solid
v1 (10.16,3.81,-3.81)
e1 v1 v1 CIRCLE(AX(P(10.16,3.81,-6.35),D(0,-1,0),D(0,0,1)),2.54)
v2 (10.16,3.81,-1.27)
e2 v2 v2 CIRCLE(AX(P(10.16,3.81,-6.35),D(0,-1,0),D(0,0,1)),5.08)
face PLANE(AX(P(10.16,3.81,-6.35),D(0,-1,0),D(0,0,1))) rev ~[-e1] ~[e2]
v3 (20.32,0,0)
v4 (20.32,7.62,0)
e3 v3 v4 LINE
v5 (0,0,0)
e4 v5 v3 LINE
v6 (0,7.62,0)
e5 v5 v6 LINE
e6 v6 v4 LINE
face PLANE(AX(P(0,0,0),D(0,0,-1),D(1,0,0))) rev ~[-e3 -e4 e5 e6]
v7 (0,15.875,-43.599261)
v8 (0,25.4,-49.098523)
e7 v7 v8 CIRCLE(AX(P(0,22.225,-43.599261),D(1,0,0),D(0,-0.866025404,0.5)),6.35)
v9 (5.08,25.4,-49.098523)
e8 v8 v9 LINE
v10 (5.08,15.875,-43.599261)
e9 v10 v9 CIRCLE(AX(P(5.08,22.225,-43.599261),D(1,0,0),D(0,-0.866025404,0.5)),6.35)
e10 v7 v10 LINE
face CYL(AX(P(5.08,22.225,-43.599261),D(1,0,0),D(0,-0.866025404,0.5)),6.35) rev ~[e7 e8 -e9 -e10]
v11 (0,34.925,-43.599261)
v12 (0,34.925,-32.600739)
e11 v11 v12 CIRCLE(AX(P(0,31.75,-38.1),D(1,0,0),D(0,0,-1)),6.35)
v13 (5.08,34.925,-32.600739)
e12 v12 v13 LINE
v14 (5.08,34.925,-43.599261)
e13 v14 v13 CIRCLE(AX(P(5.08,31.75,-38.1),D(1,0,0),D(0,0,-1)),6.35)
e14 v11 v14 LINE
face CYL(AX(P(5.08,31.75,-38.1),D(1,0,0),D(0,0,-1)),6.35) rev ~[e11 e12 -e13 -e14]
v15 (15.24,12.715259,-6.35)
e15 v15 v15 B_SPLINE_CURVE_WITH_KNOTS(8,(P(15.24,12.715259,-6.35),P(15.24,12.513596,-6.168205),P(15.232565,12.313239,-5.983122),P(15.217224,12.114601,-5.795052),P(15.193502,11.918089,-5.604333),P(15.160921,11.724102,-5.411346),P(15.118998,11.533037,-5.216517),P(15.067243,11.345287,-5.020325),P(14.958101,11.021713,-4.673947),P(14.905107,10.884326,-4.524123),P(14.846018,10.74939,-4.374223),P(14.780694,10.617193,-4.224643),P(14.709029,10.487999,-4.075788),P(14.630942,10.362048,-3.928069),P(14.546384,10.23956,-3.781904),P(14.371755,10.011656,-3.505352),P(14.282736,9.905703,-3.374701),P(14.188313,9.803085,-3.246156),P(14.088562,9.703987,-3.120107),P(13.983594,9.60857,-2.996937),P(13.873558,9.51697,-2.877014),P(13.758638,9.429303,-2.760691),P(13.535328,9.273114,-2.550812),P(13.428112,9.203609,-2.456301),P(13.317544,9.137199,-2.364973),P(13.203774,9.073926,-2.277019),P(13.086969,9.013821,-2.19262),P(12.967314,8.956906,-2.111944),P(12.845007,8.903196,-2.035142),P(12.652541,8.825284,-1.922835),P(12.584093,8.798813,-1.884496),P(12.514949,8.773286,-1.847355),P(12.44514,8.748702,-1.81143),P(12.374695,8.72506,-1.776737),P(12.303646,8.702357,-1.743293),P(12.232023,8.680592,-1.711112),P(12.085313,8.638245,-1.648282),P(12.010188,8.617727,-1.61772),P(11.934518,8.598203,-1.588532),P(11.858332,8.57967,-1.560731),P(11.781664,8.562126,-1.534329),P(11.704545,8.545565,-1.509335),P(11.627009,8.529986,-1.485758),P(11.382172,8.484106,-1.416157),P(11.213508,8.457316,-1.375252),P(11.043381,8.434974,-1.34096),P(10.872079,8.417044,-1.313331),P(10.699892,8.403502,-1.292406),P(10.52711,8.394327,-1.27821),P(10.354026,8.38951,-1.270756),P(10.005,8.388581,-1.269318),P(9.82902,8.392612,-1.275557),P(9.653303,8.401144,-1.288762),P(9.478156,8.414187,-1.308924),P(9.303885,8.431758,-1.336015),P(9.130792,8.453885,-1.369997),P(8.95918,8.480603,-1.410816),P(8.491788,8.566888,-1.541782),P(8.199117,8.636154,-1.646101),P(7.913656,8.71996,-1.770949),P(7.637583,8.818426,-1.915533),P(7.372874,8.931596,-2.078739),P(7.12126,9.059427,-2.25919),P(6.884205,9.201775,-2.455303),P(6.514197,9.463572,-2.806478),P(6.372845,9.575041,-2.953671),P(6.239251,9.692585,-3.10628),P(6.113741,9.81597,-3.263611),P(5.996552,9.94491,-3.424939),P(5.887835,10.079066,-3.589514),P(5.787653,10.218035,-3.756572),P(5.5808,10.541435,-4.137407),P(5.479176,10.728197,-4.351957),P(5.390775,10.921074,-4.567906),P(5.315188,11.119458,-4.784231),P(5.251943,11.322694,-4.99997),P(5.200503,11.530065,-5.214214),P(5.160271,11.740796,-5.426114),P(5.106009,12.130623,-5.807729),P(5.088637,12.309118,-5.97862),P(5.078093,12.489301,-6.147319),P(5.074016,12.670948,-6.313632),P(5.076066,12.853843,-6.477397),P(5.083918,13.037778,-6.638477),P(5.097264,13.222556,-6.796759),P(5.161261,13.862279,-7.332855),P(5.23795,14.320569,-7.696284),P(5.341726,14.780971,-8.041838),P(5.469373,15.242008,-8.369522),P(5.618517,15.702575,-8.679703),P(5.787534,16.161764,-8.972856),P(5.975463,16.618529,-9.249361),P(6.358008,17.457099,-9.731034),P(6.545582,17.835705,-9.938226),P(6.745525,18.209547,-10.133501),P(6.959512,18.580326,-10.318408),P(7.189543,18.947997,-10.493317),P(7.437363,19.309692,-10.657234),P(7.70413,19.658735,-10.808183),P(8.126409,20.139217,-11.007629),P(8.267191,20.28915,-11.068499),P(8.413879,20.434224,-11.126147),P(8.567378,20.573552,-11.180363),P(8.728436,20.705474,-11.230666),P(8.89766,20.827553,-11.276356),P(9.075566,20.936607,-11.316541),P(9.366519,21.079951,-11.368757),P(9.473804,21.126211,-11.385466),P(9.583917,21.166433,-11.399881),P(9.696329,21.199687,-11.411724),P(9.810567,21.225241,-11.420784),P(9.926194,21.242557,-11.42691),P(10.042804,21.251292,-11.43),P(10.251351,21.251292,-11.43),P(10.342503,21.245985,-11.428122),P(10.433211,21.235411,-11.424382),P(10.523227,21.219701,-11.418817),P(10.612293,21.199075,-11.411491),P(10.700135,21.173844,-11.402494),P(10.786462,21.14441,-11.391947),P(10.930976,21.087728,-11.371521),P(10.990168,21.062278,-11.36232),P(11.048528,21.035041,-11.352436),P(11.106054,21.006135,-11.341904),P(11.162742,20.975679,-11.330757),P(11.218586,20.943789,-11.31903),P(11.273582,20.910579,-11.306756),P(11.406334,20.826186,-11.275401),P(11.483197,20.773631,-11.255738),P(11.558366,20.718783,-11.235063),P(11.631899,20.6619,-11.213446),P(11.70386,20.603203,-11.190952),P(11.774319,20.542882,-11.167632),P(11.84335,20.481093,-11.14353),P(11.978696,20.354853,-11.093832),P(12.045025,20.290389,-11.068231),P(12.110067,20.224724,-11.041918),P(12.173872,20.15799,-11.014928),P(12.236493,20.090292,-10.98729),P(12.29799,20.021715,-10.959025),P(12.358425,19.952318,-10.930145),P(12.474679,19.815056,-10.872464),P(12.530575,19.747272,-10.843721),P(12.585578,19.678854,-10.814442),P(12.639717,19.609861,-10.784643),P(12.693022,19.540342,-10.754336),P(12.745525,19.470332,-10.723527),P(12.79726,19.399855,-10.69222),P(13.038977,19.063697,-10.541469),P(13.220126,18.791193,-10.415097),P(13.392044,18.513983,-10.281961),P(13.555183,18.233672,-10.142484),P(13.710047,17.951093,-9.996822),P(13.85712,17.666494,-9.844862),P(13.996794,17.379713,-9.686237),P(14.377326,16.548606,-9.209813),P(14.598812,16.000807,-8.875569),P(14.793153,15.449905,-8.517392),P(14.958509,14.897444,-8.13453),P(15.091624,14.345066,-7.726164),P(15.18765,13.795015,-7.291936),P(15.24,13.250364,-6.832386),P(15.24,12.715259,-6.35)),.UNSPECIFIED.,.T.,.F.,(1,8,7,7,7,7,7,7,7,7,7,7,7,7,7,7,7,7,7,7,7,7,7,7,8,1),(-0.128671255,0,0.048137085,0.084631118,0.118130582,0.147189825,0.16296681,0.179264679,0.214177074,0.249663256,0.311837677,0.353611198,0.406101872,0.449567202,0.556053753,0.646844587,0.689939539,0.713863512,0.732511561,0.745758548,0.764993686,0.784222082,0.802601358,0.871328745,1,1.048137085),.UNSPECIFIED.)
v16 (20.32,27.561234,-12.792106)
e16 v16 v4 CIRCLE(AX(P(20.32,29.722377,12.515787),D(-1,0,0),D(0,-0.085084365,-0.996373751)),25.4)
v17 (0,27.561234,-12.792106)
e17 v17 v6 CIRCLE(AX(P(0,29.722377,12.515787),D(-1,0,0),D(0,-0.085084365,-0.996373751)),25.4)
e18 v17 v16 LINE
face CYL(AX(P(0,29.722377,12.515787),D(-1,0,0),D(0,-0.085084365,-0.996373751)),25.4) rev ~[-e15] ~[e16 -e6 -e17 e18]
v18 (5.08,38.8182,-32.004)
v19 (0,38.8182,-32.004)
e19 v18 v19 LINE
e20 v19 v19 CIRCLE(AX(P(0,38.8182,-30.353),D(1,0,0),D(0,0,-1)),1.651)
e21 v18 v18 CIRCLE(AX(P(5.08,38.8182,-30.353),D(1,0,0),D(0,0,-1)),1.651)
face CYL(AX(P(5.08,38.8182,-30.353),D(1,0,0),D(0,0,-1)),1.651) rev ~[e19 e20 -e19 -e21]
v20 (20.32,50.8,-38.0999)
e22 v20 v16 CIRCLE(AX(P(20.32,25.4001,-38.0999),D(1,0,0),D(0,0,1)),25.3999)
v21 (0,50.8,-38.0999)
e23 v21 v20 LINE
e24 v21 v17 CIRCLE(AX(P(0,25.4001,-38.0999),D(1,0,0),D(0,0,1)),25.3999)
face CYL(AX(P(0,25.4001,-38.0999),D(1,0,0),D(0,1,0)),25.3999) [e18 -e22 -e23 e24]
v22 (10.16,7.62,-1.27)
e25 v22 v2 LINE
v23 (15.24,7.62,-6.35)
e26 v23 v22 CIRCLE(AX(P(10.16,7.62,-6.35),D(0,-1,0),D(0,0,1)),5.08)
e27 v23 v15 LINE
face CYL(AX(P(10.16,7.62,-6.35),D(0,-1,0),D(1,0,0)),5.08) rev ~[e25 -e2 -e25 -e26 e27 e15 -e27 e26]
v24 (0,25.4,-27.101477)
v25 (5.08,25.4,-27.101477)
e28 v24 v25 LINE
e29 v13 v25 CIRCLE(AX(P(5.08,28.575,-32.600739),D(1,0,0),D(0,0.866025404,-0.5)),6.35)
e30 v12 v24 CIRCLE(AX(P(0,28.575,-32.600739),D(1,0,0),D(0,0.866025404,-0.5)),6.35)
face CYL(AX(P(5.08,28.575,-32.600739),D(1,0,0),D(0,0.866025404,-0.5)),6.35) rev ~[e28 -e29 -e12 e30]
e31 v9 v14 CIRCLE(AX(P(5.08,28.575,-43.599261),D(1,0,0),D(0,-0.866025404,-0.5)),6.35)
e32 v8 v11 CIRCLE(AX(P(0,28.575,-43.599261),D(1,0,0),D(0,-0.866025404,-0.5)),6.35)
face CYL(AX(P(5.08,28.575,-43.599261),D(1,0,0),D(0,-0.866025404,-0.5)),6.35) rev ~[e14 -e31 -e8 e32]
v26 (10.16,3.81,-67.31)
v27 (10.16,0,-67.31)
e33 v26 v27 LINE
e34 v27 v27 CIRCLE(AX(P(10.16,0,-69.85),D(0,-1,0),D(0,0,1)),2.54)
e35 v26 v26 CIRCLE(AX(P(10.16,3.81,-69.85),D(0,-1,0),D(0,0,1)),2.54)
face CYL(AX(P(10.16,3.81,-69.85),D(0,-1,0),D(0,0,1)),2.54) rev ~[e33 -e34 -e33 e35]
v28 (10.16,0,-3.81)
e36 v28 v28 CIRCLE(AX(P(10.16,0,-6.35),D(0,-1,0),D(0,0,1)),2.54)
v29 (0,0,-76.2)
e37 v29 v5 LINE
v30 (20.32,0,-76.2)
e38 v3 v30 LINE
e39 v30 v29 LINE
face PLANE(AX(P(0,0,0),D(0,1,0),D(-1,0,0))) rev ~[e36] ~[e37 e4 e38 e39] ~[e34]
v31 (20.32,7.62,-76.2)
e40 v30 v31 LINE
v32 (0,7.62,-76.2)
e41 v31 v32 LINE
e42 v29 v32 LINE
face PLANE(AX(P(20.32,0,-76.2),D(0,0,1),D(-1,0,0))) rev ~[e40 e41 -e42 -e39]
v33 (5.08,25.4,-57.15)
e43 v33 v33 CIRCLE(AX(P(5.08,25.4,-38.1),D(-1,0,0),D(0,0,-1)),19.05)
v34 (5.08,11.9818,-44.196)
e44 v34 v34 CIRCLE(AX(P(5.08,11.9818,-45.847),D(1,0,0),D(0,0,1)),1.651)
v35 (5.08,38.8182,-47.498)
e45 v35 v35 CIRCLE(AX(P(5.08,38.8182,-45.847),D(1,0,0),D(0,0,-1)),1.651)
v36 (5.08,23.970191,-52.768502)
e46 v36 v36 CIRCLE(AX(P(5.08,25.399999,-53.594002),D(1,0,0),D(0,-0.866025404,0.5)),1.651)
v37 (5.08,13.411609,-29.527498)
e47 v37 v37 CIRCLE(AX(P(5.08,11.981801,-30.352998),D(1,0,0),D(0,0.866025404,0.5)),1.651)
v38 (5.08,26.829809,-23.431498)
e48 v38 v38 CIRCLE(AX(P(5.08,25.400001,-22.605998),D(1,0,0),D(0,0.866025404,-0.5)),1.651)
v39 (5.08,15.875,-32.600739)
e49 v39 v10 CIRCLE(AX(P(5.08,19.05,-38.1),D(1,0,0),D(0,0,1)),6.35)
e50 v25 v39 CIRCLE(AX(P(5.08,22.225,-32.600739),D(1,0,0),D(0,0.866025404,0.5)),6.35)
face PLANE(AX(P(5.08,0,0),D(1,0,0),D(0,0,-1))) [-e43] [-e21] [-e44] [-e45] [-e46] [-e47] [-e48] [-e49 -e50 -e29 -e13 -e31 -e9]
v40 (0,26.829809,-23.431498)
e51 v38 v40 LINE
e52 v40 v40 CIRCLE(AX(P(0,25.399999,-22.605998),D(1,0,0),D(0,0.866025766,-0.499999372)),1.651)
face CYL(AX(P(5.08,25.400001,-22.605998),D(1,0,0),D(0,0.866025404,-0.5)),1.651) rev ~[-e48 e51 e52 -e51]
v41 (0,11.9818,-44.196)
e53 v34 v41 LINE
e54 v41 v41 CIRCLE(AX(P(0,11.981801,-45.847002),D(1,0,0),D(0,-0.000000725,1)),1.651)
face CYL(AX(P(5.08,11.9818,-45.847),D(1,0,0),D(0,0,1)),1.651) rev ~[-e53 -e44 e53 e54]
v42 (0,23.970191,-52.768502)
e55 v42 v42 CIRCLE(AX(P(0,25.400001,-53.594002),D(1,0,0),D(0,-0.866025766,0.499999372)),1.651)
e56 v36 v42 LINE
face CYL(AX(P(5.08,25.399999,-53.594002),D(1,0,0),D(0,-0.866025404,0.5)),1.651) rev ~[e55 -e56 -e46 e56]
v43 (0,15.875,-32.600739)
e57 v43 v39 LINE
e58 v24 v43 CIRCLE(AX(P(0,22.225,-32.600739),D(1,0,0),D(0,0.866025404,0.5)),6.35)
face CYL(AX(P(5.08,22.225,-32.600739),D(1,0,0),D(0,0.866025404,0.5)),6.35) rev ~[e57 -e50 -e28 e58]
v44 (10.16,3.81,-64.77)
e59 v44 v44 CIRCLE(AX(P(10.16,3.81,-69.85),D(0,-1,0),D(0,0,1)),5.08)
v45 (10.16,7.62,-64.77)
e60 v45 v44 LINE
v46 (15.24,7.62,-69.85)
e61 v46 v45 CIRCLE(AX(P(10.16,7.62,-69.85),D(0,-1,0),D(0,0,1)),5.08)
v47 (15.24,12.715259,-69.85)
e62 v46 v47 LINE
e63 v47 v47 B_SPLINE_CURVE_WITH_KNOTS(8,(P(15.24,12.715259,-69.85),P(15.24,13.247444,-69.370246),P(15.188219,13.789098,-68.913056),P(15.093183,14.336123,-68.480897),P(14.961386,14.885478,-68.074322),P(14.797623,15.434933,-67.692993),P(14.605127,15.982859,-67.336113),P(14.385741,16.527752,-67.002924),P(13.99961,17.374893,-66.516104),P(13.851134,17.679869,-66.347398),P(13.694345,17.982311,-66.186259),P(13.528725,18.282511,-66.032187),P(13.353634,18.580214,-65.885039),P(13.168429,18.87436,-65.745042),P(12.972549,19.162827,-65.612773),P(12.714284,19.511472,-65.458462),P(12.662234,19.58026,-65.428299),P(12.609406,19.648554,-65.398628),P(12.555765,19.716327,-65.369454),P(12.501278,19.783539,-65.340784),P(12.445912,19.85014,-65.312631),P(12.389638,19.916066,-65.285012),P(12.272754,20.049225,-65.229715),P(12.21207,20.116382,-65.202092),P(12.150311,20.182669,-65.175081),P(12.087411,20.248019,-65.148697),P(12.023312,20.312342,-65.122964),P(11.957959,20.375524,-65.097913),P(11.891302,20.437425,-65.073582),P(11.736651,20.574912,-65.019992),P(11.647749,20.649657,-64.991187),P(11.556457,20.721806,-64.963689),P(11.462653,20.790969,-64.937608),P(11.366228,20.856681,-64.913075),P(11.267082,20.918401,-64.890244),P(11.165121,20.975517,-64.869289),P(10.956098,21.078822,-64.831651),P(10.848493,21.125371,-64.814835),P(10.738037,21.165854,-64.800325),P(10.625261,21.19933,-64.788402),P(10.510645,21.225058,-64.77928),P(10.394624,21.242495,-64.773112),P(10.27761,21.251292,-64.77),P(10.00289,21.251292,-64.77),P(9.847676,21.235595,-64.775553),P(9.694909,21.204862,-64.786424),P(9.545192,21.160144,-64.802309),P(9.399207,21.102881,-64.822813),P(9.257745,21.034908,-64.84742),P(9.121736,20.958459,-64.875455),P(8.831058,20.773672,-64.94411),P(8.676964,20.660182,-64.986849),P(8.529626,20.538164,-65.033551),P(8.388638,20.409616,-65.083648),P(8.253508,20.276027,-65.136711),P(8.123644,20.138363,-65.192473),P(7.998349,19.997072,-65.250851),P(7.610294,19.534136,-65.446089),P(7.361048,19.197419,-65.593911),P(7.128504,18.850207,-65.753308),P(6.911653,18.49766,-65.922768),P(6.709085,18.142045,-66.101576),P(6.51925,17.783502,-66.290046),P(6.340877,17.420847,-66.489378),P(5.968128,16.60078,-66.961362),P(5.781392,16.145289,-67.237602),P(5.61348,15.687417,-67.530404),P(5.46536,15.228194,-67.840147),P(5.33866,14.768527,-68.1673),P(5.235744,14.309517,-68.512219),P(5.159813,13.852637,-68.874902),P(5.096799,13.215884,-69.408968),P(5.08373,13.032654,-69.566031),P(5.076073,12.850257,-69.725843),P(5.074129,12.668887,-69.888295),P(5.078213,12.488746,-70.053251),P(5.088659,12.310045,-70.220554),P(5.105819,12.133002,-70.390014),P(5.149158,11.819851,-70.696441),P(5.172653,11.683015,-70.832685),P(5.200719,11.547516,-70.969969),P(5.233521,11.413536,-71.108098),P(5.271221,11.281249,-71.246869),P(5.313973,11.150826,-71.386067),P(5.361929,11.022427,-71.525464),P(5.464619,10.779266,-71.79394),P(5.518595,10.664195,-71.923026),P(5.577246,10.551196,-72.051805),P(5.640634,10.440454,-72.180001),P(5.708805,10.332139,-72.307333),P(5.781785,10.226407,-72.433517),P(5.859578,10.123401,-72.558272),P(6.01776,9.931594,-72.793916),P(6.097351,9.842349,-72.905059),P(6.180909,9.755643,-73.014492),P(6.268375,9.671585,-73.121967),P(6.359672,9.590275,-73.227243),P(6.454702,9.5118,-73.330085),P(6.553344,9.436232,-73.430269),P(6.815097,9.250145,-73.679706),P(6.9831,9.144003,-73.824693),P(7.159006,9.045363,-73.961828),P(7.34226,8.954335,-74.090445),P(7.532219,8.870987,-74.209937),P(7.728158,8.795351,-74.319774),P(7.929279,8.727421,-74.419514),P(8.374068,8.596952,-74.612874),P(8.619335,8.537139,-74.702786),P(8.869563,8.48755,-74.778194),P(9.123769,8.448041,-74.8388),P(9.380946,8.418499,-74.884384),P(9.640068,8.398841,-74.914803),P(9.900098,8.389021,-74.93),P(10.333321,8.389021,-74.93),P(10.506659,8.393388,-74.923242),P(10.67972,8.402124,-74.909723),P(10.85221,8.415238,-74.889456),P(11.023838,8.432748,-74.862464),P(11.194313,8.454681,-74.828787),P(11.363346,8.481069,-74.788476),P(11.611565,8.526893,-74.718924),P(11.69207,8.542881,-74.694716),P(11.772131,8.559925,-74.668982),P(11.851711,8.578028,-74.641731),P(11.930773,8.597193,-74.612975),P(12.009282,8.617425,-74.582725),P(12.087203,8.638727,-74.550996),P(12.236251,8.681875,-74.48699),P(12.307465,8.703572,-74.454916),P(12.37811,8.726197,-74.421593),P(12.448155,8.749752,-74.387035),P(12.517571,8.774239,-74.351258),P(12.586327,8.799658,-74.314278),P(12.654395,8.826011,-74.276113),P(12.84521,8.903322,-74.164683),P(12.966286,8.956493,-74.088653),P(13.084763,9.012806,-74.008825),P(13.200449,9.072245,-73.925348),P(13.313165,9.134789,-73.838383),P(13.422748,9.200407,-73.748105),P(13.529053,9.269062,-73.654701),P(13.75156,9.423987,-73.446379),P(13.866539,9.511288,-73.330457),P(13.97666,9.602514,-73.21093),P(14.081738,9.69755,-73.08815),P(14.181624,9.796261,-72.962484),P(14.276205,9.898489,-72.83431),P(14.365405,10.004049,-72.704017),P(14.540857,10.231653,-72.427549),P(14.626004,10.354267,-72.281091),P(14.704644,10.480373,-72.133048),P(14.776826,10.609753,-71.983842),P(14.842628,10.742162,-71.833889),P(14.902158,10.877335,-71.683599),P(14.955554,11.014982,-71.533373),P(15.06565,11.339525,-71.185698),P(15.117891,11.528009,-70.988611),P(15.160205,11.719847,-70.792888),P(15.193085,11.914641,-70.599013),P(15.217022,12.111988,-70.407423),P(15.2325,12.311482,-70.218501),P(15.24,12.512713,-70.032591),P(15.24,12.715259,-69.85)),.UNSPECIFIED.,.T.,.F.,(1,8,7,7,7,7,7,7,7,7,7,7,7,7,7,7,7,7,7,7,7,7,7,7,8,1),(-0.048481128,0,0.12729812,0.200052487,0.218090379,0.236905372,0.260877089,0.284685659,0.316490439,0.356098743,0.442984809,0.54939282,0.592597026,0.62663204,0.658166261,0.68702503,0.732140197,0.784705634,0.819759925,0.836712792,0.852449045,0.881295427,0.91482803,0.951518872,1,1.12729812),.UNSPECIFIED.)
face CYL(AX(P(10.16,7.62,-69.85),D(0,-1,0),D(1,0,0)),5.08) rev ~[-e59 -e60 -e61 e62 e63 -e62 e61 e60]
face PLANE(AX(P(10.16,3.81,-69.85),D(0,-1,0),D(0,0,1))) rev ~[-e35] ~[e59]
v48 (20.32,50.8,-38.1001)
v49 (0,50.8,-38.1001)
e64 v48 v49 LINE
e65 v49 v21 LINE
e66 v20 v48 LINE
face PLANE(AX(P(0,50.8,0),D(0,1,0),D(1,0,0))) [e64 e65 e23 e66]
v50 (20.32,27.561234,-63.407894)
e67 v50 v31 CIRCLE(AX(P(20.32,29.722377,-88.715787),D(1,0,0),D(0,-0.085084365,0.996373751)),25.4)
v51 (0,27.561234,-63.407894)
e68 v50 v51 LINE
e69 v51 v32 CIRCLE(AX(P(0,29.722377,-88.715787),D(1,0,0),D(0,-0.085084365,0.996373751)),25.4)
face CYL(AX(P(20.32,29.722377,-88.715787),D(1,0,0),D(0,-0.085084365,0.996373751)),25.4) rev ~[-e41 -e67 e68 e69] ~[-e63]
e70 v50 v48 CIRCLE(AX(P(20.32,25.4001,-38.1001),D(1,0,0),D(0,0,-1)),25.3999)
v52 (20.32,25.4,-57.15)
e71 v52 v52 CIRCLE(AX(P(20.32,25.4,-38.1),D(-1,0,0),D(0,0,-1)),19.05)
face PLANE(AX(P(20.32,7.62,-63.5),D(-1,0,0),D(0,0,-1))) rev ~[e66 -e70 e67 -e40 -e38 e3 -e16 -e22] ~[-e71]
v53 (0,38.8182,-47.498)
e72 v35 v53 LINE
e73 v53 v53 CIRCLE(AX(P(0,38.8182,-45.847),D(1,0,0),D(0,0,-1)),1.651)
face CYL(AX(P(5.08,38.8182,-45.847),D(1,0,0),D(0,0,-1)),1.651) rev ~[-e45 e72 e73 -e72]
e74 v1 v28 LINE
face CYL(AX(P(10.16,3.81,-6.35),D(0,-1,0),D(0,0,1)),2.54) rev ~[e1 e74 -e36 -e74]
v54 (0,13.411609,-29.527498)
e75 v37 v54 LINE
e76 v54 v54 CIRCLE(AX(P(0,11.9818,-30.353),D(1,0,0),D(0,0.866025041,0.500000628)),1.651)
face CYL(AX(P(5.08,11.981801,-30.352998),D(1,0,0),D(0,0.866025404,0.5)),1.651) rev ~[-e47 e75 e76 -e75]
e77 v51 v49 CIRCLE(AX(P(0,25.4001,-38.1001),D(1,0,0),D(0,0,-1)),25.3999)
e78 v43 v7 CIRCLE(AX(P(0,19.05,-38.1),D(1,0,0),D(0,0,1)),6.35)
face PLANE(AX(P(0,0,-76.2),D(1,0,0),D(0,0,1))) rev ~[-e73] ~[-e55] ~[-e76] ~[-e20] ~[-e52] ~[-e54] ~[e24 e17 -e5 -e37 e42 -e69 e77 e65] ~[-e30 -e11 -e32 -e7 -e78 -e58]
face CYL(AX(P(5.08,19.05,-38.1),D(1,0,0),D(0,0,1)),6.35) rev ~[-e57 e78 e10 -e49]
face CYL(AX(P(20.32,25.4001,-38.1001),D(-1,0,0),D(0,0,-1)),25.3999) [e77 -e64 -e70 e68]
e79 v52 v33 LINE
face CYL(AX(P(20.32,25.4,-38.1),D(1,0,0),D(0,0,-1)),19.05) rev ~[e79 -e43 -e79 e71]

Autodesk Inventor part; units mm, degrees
ref_plane "YZ Plane" through (0, 0, 0) normal (1, 0, 0) x (0, 1, 0)
ref_plane "XZ Plane" through (0, 0, 0) normal (0, 1, 0) x (-1, 0, 0)
ref_plane "XY Plane" through (0, 0, 0) normal (0, 0, 1) x (1, 0, 0)
sketch "Sketch1" plane through (0, 0, 0) normal (0, 1, 0) x (-1, 0, 0)
  line L0 (0, 0) -> (-20.32, 0)
  line L1 (-20.32, 0) -> (-20.32, -76.2)
  line L2 (-20.32, -76.2) -> (0, -76.2)
  line L3 (0, -76.2) -> (0, 0)
  dimension "d0" = 20.32
  dimension "d1" = 76.2
extrude "Extrusion1" add sketch "Sketch1" along normal blind 7.62
sketch "Sketch2" plane through (0, 7.62, 0) normal (0, 1, 0) x (1, 0, 0)
  line L0 (0, 0) -> (0, 12.7)
  line L1 (0, 12.7) -> (20.32, 12.7)
  line L2 (20.32, 12.7) -> (20.32, 63.5)
  line L3 (20.32, 63.5) -> (0, 63.5)
  line L4 (0, 63.5) -> (0, 12.7)
  dimension "d4" = 12.7
  dimension "d5" = 20.32
  dimension "d6" = 50.8
extrude "Extrusion2" add sketch "Sketch2" along normal blind 43.18
sketch "Sketch3" plane through (20.32, 0, 0) normal (1, 0, 0) x (0, 0, -1)
  line L0 (12.7, 50.8) -> (63.5, 50.8) projected
  line L1 (38.1, 50.8) -> (38.1, 25.4)
  circle A0 centre (38.1, 25.4) radius 19.05
  point P0 (0, 0)
  dimension "d9" = 25.4
  dimension "d10" = 38.1
extrude "Extrusion3" cut sketch "Sketch3" against normal blind 15.24
fillet "Fillet1" radius 25.4 2 edges at (10.16, 50.8, -63.5) (10.16, 50.8, -12.7)
sketch "Sketch6" plane through (0, 7.62, 0) normal (0, 1, 0) x (1, 0, 0)
  line L0 (0, 0) -> (20.32, 0) projected
  line L1 (10.16, 0) -> (10.16, 6.35)
  line L2 (20.32, 76.2) -> (0, 76.2) projected
  line L3 (10.16, 76.2) -> (10.16, 69.85)
  dimension "d20" = 6.35
  dimension "d21" = 6.35
fillet "Fillet2" radius 25.4 2 edges at (10.16, 7.62, -63.5) (10.16, 7.62, -12.7)
hole "Hole1" at (10.16, 7.62, -6.35) at (10.16, 7.62, -69.85) direction (0, -1, 0) diameter 5.08 end through all counterbore diameter 10.16 counterbore depth 3.81
sketch "Sketch7" plane through (10.16, 7.62, -6.35) normal (0, -1, 0) x (1, 0, 0)
  circle A0 centre (0, 0) radius 5.08
  circle A1 centre (0, -63.5) radius 2.54 projected
  line L0 (-2.54, -63.5) -> (0, -63.5)
  circle A2 centre (0, -63.5) radius 5.08
  point P0 (-10.16, 6.35)
  dimension "d30" = 10.16
  dimension "d31" = 10.16
extrude "Extrusion5" cut sketch "Sketch7" against normal blind 15.24 contours A0 | A1 | A2
sketch "Sketch10" plane through (5.08, 25.4, -38.1) normal (1, 0, 0) x (0, 0, -1)
  line L0 (0, 0) -> (0, 6.35)
  circle A0 centre (0, 6.35) radius 6.35
  point P0 (-38.1, -25.4)
  dimension "d65" = 6.35
extrude "Extrusion8" cut sketch "Sketch10" against normal blind 25.4
sketch "Sketch12" plane through (5.08, 25.4, -38.1) normal (1, 0, 0) x (0, 0, -1)
  circle A0 centre (0, 6.35) radius 6.35 projected
  line L0 (0, 0) -> (14.3694, 0) construction
  line L1 (0, 0) -> (14.3694, 0) construction
  line L2 (0, 0) -> (-7.747, 13.4182)
  line L3 (0, 0) -> (15.494, 0) construction
  line L4 (0, 0) -> (7.747, 13.4182)
  line L5 (0, 0) -> (15.494, 0) construction
  circle A1 centre (-7.747, 13.4182) radius 1.651
  circle A2 centre (7.747, 13.4182) radius 1.651
  point P0 (-38.1, -25.4)
  dimension "d79" = 15.494
  dimension "d80" = 120
  dimension "d81" = 15.494
  dimension "d82" = 60
  dimension "d83" = 3.302
  dimension "d84" = 3.302
extrude "Extrusion9" cut sketch "Sketch12" against normal blind 25.4 contours A1 | A2
sketch "Sketch13" plane through (5.08, 25.4, -38.1) normal (1, 0, 0) x (0, 0, -1)
  circle A0 centre (0, 6.35) radius 6.35 projected
  point P0 (-38.1, -25.4)
  point P1 (0, 0)
pattern_circular "Circular Pattern3" count 6 over 360 about axis through (5.08, 25.4, -38.1) along (1, 0, 0) of "Extrusion8", "Extrusion9"
properties part number "Motor Mount V2"
